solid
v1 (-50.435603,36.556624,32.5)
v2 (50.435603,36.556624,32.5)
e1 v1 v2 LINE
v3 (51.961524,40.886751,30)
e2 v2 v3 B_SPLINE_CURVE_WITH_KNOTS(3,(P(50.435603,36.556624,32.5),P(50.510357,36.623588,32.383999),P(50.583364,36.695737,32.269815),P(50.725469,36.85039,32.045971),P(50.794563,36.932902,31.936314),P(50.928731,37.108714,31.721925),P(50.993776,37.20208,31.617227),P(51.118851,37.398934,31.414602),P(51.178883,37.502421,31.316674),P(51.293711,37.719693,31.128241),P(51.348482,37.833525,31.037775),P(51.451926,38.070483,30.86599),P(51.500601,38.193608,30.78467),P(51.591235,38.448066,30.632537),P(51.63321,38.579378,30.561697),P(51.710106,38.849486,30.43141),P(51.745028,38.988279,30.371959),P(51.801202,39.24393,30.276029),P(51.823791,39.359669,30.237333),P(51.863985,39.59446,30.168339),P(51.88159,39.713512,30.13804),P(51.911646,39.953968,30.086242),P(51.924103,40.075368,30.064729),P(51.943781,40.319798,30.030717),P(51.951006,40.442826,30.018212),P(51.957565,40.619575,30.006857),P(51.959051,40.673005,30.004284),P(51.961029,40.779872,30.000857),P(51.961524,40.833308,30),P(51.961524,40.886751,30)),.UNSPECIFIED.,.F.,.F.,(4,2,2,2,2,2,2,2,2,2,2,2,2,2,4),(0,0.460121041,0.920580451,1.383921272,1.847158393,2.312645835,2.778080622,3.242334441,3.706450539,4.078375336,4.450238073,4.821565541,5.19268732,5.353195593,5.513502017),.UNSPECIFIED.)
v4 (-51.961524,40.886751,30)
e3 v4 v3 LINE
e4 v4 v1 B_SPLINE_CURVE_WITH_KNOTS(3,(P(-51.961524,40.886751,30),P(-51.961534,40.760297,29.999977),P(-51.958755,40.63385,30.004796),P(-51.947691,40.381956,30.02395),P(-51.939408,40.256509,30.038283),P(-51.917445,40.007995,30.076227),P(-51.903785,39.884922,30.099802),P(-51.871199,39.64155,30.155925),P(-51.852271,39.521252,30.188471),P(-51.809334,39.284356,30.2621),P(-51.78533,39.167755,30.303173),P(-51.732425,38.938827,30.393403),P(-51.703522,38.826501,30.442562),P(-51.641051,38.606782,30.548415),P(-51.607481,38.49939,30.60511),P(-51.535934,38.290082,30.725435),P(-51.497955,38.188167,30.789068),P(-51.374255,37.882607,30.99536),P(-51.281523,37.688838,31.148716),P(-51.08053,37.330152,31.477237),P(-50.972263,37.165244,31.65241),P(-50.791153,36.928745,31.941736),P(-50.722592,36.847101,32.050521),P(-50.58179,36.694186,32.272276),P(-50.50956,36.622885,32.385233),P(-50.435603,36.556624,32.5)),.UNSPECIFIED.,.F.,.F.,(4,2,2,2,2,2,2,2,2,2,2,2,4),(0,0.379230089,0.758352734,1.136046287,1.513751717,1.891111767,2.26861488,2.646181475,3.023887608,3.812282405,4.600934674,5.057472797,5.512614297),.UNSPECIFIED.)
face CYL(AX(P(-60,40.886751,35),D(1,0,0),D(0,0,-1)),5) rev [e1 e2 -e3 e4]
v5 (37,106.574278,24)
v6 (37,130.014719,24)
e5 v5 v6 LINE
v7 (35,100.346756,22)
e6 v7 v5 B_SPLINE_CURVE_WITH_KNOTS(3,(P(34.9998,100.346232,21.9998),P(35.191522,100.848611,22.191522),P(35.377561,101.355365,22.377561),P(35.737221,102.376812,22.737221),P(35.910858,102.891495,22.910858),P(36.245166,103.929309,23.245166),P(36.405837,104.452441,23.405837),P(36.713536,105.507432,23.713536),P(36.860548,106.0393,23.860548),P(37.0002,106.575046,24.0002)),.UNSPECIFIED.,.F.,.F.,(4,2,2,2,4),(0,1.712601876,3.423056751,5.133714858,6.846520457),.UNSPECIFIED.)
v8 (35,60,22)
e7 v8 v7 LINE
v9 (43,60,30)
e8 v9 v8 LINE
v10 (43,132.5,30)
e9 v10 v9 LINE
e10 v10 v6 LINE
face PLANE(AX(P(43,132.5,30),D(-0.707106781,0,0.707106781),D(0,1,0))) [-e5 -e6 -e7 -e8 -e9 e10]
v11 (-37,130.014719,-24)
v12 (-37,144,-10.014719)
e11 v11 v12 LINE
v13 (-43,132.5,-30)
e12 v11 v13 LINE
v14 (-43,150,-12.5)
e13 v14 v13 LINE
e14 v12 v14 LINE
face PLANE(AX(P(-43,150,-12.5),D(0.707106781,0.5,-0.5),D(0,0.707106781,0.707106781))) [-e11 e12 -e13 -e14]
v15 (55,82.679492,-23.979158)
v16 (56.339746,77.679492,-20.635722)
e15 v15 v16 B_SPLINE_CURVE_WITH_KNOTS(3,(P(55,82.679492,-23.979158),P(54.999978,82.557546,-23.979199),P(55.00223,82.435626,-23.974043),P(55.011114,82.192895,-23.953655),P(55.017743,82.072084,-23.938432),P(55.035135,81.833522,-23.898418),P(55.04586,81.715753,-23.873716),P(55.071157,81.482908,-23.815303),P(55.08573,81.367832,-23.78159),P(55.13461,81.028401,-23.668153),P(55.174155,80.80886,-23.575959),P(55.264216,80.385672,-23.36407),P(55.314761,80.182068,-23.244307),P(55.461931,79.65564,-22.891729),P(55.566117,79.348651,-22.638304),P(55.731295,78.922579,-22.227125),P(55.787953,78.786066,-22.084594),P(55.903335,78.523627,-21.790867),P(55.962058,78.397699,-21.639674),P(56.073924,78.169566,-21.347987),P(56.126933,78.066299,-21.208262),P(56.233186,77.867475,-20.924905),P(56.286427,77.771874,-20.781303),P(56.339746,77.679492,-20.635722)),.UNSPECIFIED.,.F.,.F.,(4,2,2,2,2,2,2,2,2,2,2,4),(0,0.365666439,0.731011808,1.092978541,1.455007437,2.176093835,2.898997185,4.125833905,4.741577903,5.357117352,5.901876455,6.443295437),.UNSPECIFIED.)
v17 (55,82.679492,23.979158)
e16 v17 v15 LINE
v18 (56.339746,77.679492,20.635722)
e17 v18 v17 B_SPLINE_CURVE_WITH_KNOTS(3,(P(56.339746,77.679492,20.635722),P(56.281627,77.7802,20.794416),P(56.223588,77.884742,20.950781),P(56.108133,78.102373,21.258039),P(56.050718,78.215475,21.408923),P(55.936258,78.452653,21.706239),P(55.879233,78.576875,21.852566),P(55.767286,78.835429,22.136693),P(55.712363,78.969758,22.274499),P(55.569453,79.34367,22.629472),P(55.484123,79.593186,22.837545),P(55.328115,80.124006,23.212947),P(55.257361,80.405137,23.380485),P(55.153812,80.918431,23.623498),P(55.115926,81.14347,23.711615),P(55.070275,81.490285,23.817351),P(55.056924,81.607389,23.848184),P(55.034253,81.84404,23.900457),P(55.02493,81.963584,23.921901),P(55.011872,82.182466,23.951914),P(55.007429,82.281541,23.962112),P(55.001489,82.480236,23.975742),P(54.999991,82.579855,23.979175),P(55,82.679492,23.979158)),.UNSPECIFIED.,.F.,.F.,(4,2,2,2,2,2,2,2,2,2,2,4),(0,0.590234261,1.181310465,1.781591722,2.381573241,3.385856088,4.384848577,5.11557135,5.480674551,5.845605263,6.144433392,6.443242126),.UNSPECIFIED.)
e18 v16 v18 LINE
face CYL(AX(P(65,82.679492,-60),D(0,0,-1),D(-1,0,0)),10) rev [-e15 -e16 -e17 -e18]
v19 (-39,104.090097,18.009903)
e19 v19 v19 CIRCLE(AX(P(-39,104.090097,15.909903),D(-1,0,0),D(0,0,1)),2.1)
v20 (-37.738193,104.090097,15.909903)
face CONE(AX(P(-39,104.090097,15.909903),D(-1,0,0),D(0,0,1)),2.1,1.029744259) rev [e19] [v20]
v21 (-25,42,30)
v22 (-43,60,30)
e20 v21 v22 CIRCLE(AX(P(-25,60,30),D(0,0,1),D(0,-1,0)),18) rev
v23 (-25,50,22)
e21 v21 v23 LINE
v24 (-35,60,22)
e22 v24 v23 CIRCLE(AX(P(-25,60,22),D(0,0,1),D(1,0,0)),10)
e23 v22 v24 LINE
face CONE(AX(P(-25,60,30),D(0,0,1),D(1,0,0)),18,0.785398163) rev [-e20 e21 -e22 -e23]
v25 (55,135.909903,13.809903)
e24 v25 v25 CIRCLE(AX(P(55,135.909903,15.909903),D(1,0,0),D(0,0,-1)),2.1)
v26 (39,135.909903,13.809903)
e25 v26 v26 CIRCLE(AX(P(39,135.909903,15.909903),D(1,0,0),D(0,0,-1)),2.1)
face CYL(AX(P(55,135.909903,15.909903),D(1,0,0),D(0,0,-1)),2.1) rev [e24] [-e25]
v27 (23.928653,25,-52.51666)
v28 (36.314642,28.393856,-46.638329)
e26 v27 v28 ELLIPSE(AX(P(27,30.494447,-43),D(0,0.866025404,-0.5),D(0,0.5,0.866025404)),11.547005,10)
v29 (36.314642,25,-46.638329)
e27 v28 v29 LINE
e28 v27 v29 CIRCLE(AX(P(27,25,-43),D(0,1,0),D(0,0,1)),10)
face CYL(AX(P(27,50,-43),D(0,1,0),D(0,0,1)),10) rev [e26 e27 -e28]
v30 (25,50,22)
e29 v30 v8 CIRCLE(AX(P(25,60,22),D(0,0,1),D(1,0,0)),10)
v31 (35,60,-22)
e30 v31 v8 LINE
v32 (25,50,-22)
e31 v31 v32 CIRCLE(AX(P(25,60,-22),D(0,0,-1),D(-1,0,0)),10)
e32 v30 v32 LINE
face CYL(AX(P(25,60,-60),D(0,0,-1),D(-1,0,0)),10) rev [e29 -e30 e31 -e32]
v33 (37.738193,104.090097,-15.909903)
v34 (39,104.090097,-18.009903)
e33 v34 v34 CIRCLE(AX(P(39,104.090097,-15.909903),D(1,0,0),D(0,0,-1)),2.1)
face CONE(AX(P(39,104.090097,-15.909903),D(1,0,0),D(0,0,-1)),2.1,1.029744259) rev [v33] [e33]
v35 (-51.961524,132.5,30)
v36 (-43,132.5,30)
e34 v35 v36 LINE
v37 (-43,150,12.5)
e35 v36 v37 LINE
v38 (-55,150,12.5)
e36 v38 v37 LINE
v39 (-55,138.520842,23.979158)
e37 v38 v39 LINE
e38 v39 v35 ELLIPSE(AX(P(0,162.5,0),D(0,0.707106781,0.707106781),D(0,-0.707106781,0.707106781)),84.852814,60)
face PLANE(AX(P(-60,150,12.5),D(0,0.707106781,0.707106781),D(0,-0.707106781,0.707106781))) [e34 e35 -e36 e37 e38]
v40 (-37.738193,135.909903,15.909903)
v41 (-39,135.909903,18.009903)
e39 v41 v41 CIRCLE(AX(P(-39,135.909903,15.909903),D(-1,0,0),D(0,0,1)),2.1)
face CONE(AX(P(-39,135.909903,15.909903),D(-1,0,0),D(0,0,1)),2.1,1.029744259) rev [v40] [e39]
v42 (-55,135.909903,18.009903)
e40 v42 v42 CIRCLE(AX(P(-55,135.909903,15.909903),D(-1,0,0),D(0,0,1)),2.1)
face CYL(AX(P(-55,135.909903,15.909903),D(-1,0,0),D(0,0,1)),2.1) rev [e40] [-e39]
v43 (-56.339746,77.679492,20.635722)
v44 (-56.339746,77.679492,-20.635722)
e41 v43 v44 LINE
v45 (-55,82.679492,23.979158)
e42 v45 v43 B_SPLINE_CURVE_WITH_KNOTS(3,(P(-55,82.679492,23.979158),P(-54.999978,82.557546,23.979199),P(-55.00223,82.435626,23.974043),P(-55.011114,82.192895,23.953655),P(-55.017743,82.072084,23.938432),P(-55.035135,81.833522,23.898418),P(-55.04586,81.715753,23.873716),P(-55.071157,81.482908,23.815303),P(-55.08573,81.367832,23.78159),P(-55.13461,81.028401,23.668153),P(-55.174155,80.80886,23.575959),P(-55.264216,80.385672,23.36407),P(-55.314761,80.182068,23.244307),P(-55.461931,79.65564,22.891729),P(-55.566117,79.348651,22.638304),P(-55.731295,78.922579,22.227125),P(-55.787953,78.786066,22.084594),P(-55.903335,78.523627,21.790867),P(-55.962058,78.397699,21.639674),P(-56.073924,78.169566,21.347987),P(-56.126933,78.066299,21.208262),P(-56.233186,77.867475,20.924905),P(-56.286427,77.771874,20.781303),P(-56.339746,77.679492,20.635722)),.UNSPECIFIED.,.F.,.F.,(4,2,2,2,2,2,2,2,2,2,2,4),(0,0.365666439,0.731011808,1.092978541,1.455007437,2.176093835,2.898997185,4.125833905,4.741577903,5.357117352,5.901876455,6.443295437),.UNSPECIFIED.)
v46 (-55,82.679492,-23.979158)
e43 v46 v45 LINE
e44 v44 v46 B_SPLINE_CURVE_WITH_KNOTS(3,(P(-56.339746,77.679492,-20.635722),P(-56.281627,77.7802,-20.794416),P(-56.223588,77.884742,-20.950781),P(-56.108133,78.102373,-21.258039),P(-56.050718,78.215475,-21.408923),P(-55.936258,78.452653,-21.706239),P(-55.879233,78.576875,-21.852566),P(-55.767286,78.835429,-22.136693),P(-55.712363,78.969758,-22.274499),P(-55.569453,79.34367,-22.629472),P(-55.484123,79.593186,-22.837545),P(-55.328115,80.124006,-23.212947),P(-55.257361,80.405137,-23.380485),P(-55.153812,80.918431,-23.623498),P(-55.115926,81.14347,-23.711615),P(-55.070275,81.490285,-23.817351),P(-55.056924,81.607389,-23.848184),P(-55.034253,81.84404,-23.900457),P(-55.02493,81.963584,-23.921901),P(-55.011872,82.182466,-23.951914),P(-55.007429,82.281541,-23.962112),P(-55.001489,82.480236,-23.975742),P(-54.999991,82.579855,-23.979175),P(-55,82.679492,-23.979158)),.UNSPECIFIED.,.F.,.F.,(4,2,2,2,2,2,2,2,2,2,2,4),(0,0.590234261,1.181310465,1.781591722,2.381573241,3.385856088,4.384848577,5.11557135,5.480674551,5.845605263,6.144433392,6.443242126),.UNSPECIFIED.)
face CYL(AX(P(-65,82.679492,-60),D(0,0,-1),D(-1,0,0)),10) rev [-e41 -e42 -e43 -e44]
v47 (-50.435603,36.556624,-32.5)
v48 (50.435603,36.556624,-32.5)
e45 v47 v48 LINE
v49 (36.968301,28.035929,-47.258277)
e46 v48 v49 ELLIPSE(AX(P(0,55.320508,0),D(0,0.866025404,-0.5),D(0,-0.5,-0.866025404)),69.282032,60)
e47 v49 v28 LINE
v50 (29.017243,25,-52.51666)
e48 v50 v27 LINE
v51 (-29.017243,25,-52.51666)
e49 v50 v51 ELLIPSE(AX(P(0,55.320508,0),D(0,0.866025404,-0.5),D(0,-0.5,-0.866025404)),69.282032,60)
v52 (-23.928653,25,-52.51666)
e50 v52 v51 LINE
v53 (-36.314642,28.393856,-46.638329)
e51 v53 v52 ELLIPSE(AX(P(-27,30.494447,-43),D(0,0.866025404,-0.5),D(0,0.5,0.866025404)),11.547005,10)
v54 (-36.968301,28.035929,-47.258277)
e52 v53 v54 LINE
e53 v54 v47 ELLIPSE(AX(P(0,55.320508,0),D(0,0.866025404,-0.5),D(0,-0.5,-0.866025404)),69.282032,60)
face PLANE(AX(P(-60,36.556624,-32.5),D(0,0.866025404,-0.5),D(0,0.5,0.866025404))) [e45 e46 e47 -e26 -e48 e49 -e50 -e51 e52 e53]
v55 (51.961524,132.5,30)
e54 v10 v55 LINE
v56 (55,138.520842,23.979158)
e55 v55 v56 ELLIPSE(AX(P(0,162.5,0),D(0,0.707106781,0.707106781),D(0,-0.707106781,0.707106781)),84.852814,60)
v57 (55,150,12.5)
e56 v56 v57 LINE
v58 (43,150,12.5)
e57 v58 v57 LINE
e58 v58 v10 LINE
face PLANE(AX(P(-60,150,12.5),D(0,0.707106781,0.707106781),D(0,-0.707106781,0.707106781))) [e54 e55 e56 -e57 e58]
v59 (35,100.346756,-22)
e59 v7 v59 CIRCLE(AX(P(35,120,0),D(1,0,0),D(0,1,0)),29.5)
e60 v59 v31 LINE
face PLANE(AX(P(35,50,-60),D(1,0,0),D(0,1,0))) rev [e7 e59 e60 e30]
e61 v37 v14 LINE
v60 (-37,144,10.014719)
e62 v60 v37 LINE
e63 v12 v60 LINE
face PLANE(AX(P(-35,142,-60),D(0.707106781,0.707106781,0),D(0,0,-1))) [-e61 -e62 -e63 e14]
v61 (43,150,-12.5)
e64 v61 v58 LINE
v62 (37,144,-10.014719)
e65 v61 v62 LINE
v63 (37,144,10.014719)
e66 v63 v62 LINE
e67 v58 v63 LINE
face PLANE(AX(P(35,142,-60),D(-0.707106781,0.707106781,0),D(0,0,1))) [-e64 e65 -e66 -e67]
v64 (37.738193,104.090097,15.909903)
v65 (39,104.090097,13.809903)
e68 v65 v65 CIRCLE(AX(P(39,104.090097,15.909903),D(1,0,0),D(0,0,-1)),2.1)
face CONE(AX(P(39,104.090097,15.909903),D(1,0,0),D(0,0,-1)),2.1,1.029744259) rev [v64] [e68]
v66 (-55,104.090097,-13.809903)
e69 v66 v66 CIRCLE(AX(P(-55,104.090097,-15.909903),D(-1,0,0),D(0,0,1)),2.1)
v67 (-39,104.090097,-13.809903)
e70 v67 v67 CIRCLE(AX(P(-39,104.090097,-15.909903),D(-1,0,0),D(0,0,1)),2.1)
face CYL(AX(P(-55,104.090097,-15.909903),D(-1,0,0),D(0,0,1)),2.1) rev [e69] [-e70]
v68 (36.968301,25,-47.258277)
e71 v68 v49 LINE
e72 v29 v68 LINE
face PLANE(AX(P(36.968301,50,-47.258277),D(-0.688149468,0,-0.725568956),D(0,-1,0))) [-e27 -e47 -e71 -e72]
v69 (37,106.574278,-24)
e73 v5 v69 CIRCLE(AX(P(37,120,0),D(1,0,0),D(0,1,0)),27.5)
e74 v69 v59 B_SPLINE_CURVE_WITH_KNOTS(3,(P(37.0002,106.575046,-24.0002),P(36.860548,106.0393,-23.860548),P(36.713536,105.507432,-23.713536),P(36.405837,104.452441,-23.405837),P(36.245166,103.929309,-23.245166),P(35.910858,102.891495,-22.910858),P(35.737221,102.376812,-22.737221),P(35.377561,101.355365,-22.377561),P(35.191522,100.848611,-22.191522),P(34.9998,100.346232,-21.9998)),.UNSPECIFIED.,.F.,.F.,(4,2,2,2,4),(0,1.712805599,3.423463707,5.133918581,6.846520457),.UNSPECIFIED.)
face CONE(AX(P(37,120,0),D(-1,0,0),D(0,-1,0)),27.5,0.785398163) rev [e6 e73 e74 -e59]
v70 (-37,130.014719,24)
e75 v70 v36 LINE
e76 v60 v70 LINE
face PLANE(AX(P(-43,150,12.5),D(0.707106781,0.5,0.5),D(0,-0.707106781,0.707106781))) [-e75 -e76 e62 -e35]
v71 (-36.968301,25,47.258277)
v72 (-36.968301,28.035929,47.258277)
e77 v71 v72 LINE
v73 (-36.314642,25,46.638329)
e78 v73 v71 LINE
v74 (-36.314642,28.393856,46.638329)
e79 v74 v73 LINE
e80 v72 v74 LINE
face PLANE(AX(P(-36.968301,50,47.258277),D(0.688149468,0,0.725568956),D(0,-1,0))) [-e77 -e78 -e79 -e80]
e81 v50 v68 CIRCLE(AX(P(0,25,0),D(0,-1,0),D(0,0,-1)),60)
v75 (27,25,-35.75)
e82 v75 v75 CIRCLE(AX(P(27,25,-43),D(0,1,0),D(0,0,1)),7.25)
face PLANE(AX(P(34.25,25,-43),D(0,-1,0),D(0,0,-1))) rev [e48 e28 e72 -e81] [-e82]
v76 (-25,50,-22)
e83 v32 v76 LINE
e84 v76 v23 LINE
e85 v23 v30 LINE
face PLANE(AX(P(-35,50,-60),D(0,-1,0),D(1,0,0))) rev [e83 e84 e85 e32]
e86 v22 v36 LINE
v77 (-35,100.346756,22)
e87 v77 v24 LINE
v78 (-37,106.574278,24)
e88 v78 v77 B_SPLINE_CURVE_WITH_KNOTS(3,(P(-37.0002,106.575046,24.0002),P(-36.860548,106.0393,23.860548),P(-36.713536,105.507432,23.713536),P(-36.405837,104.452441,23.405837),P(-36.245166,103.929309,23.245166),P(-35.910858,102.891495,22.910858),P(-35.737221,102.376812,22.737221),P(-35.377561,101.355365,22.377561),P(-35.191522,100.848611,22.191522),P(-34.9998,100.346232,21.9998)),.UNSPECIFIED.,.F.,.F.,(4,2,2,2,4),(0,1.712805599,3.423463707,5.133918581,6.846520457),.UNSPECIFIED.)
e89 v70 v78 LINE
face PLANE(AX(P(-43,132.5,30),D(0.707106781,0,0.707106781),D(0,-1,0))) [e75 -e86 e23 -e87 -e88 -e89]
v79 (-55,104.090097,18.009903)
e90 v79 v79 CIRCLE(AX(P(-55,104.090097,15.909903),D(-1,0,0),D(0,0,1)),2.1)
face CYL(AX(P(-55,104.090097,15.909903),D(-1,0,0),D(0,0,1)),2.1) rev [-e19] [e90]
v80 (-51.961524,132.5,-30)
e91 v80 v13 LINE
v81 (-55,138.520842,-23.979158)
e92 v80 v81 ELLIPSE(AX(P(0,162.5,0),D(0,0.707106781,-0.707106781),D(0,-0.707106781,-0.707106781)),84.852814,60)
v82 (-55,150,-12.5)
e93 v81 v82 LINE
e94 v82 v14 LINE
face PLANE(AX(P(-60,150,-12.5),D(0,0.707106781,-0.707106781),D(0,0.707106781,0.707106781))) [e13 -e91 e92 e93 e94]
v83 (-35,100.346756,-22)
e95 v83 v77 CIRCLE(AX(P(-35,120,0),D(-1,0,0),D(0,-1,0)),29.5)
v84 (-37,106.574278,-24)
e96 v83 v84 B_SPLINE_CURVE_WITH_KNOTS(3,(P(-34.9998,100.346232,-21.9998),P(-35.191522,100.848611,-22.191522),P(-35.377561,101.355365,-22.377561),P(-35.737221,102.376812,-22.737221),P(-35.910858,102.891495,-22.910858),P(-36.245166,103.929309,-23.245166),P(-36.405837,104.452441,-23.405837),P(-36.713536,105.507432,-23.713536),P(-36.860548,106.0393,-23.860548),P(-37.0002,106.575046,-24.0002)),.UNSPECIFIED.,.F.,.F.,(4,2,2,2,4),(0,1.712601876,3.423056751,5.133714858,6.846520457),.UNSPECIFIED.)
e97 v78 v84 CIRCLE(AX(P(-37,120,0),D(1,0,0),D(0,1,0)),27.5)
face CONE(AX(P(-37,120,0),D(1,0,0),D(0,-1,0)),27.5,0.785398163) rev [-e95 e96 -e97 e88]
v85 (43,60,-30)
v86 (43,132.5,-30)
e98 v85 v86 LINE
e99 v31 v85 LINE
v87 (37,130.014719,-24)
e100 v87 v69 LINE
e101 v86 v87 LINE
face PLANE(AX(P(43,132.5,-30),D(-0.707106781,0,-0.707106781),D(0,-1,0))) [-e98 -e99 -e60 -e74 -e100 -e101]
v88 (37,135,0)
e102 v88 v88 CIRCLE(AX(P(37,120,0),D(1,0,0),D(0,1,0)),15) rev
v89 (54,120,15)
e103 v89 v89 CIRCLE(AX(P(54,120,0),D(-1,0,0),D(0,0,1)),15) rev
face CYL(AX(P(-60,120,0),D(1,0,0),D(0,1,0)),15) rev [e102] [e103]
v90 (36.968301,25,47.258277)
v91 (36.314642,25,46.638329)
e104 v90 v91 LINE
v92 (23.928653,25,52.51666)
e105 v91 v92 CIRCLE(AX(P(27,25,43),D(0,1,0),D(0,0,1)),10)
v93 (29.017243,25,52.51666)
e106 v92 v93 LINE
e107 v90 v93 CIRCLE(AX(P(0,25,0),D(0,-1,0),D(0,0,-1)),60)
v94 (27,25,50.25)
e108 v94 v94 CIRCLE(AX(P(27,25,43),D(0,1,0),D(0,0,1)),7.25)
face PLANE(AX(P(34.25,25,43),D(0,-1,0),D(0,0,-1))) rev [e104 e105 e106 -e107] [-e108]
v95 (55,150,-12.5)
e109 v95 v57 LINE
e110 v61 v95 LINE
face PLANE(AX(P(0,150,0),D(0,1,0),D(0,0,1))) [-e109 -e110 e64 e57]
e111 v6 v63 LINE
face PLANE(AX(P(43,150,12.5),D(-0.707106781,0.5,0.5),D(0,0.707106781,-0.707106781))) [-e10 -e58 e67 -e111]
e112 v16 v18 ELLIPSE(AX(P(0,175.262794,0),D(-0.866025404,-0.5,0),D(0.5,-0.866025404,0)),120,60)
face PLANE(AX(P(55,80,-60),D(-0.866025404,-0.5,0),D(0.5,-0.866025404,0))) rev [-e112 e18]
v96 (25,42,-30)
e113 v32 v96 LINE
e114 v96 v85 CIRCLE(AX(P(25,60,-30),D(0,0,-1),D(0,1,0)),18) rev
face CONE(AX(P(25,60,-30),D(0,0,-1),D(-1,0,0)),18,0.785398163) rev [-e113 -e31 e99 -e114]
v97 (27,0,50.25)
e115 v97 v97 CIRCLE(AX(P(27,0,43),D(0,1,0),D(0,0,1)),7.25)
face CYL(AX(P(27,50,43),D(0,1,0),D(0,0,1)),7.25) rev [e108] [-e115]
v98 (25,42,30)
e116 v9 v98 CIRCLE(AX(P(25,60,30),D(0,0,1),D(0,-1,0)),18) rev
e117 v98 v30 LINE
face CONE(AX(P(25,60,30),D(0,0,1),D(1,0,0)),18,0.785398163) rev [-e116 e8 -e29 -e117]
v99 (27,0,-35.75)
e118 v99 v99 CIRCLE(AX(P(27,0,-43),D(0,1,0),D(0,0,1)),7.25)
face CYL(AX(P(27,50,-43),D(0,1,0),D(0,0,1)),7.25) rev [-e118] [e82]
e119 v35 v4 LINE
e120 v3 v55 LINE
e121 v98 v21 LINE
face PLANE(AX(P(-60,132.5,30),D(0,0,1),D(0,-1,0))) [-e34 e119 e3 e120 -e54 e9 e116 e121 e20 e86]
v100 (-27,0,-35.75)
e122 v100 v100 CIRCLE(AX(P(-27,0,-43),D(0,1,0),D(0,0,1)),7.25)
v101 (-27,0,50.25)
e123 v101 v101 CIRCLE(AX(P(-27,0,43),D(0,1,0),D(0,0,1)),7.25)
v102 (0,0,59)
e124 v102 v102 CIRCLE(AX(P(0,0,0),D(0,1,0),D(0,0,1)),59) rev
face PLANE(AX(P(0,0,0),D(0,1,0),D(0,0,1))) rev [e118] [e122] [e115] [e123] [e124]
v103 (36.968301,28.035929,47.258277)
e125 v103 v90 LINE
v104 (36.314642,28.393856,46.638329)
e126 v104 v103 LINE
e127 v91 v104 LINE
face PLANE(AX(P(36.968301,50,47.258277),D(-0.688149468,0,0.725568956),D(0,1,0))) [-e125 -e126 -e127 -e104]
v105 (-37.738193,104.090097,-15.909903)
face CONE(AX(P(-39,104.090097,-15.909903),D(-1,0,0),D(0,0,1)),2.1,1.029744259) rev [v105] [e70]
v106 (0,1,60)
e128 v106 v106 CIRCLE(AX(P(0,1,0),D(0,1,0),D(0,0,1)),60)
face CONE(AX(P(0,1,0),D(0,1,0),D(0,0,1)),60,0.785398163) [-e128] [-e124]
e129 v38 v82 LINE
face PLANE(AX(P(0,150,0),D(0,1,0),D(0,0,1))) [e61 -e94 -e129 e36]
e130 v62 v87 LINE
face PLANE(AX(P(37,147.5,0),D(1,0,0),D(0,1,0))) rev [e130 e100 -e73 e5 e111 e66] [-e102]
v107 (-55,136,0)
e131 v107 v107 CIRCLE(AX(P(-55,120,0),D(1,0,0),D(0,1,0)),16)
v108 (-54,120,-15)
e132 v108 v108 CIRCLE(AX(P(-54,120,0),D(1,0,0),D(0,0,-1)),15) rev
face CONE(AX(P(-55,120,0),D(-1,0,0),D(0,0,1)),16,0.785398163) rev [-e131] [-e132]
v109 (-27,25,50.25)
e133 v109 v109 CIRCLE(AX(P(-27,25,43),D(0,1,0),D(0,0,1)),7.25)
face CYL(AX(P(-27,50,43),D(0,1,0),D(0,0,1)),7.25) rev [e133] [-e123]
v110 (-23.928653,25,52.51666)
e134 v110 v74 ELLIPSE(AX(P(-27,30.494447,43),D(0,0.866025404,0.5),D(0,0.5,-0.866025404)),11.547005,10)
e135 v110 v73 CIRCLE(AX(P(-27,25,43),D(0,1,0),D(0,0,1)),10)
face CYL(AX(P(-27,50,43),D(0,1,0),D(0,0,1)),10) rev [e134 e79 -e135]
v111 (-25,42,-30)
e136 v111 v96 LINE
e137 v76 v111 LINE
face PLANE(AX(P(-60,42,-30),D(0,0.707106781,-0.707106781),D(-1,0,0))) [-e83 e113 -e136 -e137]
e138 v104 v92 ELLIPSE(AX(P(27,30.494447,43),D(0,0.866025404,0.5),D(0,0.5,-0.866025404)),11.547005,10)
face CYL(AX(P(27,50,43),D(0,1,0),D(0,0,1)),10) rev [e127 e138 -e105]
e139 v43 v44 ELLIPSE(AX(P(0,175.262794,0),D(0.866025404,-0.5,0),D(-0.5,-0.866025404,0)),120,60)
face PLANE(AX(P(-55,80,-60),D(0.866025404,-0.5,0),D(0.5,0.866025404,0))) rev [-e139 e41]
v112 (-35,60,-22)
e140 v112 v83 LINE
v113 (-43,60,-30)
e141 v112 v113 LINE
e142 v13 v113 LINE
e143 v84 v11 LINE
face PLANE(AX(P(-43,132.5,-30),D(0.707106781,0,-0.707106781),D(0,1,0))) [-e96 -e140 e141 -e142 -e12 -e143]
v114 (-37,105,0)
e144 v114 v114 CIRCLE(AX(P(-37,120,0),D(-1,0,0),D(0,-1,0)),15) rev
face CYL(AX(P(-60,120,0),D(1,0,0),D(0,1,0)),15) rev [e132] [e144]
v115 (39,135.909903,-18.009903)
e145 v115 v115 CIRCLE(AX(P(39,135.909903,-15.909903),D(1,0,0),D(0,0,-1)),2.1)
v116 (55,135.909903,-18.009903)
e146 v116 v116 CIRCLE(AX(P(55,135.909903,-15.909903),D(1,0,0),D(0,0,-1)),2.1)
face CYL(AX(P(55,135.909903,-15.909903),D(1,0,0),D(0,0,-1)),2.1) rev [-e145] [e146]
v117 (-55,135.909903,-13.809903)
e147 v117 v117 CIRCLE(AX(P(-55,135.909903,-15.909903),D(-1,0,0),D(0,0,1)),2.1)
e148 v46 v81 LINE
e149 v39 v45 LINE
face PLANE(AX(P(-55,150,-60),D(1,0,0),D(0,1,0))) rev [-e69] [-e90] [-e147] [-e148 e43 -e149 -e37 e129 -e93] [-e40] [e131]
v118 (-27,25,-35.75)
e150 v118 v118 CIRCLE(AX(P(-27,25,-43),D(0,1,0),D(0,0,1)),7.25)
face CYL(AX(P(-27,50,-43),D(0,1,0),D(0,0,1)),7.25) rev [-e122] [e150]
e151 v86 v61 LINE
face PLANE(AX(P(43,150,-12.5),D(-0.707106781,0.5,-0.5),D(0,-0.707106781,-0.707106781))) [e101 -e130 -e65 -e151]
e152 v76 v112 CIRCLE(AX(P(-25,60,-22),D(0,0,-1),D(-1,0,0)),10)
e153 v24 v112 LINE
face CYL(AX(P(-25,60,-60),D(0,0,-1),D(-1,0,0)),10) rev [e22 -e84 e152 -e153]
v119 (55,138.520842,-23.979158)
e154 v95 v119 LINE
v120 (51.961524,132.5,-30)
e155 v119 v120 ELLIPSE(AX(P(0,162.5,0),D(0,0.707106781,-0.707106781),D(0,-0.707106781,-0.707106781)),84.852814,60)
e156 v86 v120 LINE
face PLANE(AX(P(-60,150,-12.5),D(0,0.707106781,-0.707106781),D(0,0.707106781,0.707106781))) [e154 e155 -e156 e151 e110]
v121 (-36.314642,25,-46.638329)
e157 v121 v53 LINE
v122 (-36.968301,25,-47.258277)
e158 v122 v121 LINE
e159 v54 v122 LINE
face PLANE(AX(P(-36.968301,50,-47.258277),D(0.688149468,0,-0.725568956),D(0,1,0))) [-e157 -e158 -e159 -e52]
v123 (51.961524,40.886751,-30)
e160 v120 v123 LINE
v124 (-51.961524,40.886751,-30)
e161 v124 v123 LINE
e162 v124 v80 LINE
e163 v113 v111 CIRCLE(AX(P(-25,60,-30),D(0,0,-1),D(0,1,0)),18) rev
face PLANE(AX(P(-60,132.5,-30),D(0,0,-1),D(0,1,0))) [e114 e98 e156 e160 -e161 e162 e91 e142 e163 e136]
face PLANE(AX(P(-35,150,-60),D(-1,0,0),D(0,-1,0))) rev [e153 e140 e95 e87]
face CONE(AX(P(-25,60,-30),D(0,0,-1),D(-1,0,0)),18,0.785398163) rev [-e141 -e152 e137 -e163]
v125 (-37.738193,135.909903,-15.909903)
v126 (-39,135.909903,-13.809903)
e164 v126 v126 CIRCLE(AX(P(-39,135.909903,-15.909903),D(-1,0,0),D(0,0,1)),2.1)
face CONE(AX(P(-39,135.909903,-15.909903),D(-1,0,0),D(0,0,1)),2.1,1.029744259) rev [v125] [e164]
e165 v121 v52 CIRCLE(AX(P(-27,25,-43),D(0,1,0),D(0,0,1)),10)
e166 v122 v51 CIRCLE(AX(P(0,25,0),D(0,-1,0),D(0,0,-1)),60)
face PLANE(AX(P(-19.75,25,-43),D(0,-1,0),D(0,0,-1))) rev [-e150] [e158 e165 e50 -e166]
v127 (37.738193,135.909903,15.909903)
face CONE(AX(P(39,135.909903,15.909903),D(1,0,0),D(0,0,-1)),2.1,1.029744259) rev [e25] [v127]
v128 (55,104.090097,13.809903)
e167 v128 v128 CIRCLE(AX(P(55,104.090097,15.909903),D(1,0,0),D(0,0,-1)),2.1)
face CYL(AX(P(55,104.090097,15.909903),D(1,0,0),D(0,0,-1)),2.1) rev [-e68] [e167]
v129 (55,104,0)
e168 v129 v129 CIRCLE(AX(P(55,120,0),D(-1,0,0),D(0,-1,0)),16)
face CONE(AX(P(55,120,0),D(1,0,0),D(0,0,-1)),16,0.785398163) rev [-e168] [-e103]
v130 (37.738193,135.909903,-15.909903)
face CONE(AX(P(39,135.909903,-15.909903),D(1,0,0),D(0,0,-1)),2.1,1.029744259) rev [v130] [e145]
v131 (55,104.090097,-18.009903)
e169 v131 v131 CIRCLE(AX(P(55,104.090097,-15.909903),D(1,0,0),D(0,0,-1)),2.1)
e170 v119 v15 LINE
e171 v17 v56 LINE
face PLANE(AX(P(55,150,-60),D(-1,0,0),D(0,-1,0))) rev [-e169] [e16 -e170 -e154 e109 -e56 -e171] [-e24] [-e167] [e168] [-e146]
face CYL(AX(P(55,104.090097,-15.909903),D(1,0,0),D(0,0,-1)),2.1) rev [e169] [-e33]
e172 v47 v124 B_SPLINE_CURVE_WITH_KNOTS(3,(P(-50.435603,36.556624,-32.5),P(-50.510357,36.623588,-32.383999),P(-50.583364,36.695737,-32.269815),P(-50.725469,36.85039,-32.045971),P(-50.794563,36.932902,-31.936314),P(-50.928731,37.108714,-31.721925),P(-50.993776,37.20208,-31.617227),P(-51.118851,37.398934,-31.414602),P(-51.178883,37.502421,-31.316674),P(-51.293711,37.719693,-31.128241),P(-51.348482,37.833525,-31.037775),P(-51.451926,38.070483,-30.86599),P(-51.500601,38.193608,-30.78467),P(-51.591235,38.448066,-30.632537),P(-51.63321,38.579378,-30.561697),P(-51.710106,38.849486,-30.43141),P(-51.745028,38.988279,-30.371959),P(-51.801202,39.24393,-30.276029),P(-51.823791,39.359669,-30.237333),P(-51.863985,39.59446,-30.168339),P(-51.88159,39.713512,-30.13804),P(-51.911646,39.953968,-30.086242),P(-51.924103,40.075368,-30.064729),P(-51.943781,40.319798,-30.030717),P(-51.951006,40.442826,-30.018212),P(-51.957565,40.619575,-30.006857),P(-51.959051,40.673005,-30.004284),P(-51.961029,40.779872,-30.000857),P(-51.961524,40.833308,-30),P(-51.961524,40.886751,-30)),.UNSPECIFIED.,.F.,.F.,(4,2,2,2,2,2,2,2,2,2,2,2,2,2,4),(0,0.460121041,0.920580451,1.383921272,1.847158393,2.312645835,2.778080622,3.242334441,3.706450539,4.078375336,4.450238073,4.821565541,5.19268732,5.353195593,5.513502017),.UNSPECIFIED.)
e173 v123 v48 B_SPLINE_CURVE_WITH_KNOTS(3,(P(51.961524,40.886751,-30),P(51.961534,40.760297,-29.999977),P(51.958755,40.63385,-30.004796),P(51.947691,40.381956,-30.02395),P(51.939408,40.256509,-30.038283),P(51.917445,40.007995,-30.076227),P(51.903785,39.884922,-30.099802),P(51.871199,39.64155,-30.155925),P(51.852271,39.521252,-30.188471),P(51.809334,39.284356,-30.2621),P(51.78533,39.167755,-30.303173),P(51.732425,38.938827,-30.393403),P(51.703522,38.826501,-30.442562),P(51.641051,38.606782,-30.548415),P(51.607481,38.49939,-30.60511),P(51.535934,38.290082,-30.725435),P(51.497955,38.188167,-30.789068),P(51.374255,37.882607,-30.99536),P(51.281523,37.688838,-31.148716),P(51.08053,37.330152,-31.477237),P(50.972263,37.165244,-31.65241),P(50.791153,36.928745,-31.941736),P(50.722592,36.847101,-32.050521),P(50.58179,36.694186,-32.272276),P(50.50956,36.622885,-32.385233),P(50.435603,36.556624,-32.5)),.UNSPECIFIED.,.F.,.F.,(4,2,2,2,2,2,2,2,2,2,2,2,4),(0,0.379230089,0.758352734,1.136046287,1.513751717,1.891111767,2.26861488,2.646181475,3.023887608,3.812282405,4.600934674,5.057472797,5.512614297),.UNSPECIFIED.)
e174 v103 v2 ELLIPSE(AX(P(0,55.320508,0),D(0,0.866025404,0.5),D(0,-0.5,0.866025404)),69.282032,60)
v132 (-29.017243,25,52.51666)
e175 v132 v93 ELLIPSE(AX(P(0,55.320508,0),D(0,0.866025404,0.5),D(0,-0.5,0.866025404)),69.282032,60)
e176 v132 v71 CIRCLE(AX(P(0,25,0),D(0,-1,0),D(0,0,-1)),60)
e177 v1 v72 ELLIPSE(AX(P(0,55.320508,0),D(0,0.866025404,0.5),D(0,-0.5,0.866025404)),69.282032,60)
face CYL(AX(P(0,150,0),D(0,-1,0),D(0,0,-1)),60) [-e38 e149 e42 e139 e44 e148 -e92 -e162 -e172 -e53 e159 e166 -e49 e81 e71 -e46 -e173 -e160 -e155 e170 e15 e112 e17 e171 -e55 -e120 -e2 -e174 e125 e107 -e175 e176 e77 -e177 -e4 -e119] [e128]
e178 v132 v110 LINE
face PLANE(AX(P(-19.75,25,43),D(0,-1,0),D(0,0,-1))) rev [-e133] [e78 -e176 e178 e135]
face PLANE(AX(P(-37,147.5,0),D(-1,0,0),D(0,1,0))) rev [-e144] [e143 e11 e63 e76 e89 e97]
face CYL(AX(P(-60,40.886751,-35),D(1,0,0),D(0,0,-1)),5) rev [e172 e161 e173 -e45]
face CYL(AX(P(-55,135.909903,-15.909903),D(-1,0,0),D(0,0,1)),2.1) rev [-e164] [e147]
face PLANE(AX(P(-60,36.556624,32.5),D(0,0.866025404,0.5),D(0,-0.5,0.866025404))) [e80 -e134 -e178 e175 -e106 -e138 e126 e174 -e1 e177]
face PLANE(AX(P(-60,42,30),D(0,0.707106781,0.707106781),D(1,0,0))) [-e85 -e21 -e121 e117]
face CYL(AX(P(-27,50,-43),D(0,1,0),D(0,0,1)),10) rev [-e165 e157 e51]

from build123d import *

# Parameters (mm, degrees)
SKETCH1_R               = 60
BOSS_EXTRUDE1_DEPTH     = 150
CUT_EXTRUDE1_DEPTH      = 173.336879396
CUT_EXTRUDE1_DEPTH_BACK = 173.336879396
SKETCH2_W               = 70
SKETCH2_H               = 100
FILLET1_R               = 10
CUT_EXTRUDE2_DEPTH      = 173.336879553
CUT_EXTRUDE2_DEPTH_BACK = 173.336879553
SKETCH3_OUTSIDE_W       = 167.3
SKETCH3_OUTSIDE_H       = 197.3
CUT_EXTRUDE3_DEPTH      = 199.305320239
CUT_EXTRUDE3_DEPTH_BACK = 199.305320239
SKETCH4_R               = 15
CIRPATTERN1_COUNT       = 4
CHAMFER1_SIZE           = 8
HOLE1_D                 = 14.5
HOLE1_CBORE_D           = 20
HOLE1_CBORE_DEPTH       = 25
CHAMFER3_SIZE           = 1
CHAMFER4_SIZE           = 1


with BuildPart() as part:
    # Sketch1 → Boss-Extrude1 (new body)
    with BuildSketch(Plane(origin=(0, 0, 0), x_dir=(1, 0, 0), z_dir=(0, 1, 0))):
        with Locations(Location((0, 0, 0), (0, 0, 270))):
            Circle(SKETCH1_R)
    extrude(amount=BOSS_EXTRUDE1_DEPTH)

    # Sketch2 → Cut-Extrude1 (cut, two sides: drawn at the far end of the back side and taken through both)
    with BuildSketch(Plane.XY.offset(-CUT_EXTRUDE1_DEPTH_BACK)):
        with Locations((0, 100)):
            Rectangle(SKETCH2_W, SKETCH2_H)
        Polygon((-55, 150), (-55, 80), (-60, 71.339745962), (-60, 150), align=None)
        Polygon((55, 80), (60, 71.339745962), (60, 150), (55, 150), align=None)
    extrude(amount=CUT_EXTRUDE1_DEPTH + CUT_EXTRUDE1_DEPTH_BACK, mode=Mode.SUBTRACT)

    # Fillet1
    fillet1_edges = [part.edges().sort_by_distance(p)[0] for p in [
        (-35, 50, 0),
        (35, 50, 0),
        (-55, 80, 0),
        (55, 80, 0),
    ]]
    fillet(fillet1_edges, radius=FILLET1_R)

    # Sketch3 outside → Cut-Extrude2 (cut, two sides: drawn at the far end of the back side and taken through both)
    with BuildSketch(Plane(origin=(0, 0, 0), x_dir=(0, 0, -1), z_dir=(1, 0, 0)).offset(-CUT_EXTRUDE2_DEPTH_BACK)):
        with Locations((0, 75)):
            Rectangle(SKETCH3_OUTSIDE_W, SKETCH3_OUTSIDE_H)
        with BuildLine():
            Line((-12.5, 150), (-30, 132.5))
            Line((-30, 132.5), (-30, 40.886751346))
            ThreePointArc((-30, 40.886751346), (-30.669872981, 38.386751346), (-32.5, 36.556624327))
            Line((-32.5, 36.556624327), (-60, 20.679491924))
            Line((-60, 20.679491924), (-60, 0))
            Line((-60, 0), (60, 0))
            Line((60, 0), (60, 20.679491924))
            Line((60, 20.679491924), (32.5, 36.556624327))
            ThreePointArc((32.5, 36.556624327), (30.669872981, 38.386751346), (30, 40.886751346))
            Line((30, 40.886751346), (30, 132.5))
            Line((30, 132.5), (12.5, 150))
            Line((12.5, 150), (-12.5, 150))
        make_face(mode=Mode.SUBTRACT)
    extrude(amount=CUT_EXTRUDE2_DEPTH + CUT_EXTRUDE2_DEPTH_BACK, mode=Mode.SUBTRACT)

    # Sketch4 → Cut-Extrude3 (cut, two sides: drawn at the far end of the back side and taken through both)
    with BuildSketch(Plane(origin=(55, 0, 0), x_dir=(0, 0, -1), z_dir=(1, 0, 0)).offset(-CUT_EXTRUDE3_DEPTH_BACK)):
        with Locations(Location((0, 120, 0), (0, 0, 90))):
            Circle(SKETCH4_R)
    extrude(amount=CUT_EXTRUDE3_DEPTH + CUT_EXTRUDE3_DEPTH_BACK, mode=Mode.SUBTRACT)

    # Sketch6 → M5 Tapped Hole1 (revolve, cut)
    with BuildSketch(Plane(origin=(55, 135.909902577, -15.909902577), x_dir=(0, 0, -1), z_dir=(0, 1, 0))):
        Polygon((0, 0), (0, 17.2618073), (2.1, 16), (2.1, 0), align=None)
    m5_tapped_hole1 = revolve(axis=Axis((61.35, 135.909902577, -15.909902577), (-1, 0, 0)), mode=Mode.SUBTRACT)

    # CirPattern1: M5 Tapped Hole1 ×4 about axis
    cirpattern1_axis = Axis((0, 120, 0), (1, 0, 0))
    for i in range(1, CIRPATTERN1_COUNT):
        add(m5_tapped_hole1.rotate(cirpattern1_axis, i * 360 / CIRPATTERN1_COUNT), mode=Mode.SUBTRACT)

    # Mirror1: M5 Tapped Hole1 across plane
    add(m5_tapped_hole1.mirror(Plane(origin=(0, 0, 0), x_dir=(0, 0, 1), z_dir=(1, 0, 0))), mode=Mode.SUBTRACT)

    # Mirror1 copy 1 sketch → Mirror1 copy 1 (revolve, cut)
    with BuildSketch(Plane(origin=(-55, 135.909902577, 15.909902577), x_dir=(0, 1, 0), z_dir=(0, 0, 1))):
        Polygon((0, 0), (0, -17.2618073), (2.1, -16), (2.1, 0), align=None)
    revolve(axis=Axis((-61.35, 135.909902577, 15.909902577), (-1, 0, 0)), mode=Mode.SUBTRACT)

    # Mirror1 copy 2 sketch → Mirror1 copy 2 (revolve, cut)
    with BuildSketch(Plane(origin=(-55, 104.090097423, 15.909902577), x_dir=(0, 0, 1), z_dir=(0, -1, 0))):
        Polygon((0, 0), (0, -17.2618073), (2.1, -16), (2.1, 0), align=None)
    revolve(axis=Axis((-61.35, 104.090097423, 15.909902577), (-1, 0, 0)), mode=Mode.SUBTRACT)

    # Mirror1 copy 3 sketch → Mirror1 copy 3 (revolve, cut)
    with BuildSketch(Plane(origin=(-55, 104.090097423, -15.909902577), x_dir=(0, -1, 0), z_dir=(0, 0, -1))):
        Polygon((0, 0), (0, -17.2618073), (2.1, -16), (2.1, 0), align=None)
    revolve(axis=Axis((-61.35, 104.090097423, -15.909902577), (-1, 0, 0)), mode=Mode.SUBTRACT)

    # Chamfer1
    chamfer1_edges = [part.edges().sort_by_distance(p)[0] for p in [
        (32.071067812, 52.928932188, 30),
        (32.071067812, 52.928932188, -30),
        (-35, 150, 0),
        (35, 150, 0),
        (35, 141.25, -21.25),
        (-35, 141.25, -21.25),
        (35, 141.25, 21.25),
        (-35, 141.25, 21.25),
        (-35, 96.25, -30),
        (-32.071067812, 52.928932188, -30),
        (0, 50, -30),
        (35, 96.25, -30),
        (-32.071067812, 52.928932188, 30),
        (-35, 96.25, 30),
        (35, 96.25, 30),
        (0, 50, 30),
    ]]
    chamfer(chamfer1_edges, length=CHAMFER1_SIZE)

    # Hole1 (through all)
    with Locations(Plane(origin=(-27, 50, -43), x_dir=(1, 0, 0), z_dir=(0, 1, 0))):
        with Locations((0, 0), (54, 0), (0, -86), (54, -86)):
            CounterBoreHole(HOLE1_D / 2, HOLE1_CBORE_D / 2, HOLE1_CBORE_DEPTH)

    # Chamfer3
    chamfer3_edges = [part.edges().sort_by_distance(p)[0] for p in [
        (0, 0, -60),
    ]]
    chamfer(chamfer3_edges, length=CHAMFER3_SIZE)

    # Chamfer4
    chamfer4_edges = [part.edges().sort_by_distance(p)[0] for p in [
        (55, 105, 0),
        (-55, 105, 0),
    ]]
    chamfer(chamfer4_edges, length=CHAMFER4_SIZE)

    # Chamfer5
    # the kernel refuses this chamfer: 2 mm, written as the material it takes off along each edge
    with BuildSketch(Plane(origin=(35.377389831, 32.524460395, -48.460708711), x_dir=(0.7977683815580907, 0, 0.6029640199764695), z_dir=(0, -1, 0))) as chamfer5_piece_1:
        with BuildLine():
            Line((1.994201413, 0), (1.846539445, 0.888707135))
            ThreePointArc((1.846539445, 0.888707135), (0.956280866, 0.401837503), (0, 0))
            ThreePointArc((0, 0), (1.003653566, -0.008285296), (1.994201413, 0))
        make_face()
    extrude(amount=7.524460395, mode=Mode.SUBTRACT)
    with BuildSketch(Plane(origin=(-35.377389831, 32.524460395, -48.460708711), x_dir=(-0.7977683815580952, 0, 0.602964019976464), z_dir=(0, -1, 0))) as chamfer5_piece_2:
        with BuildLine():
            Line((1.994201413, 0), (1.846539445, -0.888707135))
            ThreePointArc((1.846539445, -0.888707135), (0.956280866, -0.401837503), (0, 0))
            ThreePointArc((0, 0), (1.003653566, 0.008285296), (1.994201413, 0))
        make_face()
    extrude(amount=7.524460395, mode=Mode.SUBTRACT)

    # Chamfer6
    # the kernel refuses this chamfer: 2 mm, written as the material it takes off along each edge
    with BuildSketch(Plane(origin=(-35.377389831, 32.524460395, 48.460708711), x_dir=(-0.45735909504580285, 0, -0.8892821026979484), z_dir=(0, -1, 0))) as chamfer6_piece_1:
        with BuildLine():
            Line((2.049270186, 0), (1.79691853, -0.864825457))
            ThreePointArc((1.79691853, -0.864825457), (0.900770777, -0.442720154), (0, 0))
            ThreePointArc((0, 0), (1.035942557, -0.052625969), (2.049270186, 0))
        make_face()
    extrude(amount=7.524460395, mode=Mode.SUBTRACT)
    with BuildSketch(Plane(origin=(35.377389831, 32.524460395, 48.460708711), x_dir=(0.45735909504580835, 0, -0.8892821026979455), z_dir=(0, -1, 0))) as chamfer6_piece_2:
        with BuildLine():
            Line((2.049270186, 0), (1.79691853, 0.864825457))
            ThreePointArc((1.79691853, 0.864825457), (0.900770777, 0.442720154), (0, 0))
            ThreePointArc((0, 0), (1.035942557, 0.052625969), (2.049270186, 0))
        make_face()
    extrude(amount=7.524460395, mode=Mode.SUBTRACT)

    # Sketch12 → Cut-Revolve1 (revolve, cut)
    with BuildSketch(Plane.XY):
        Polygon((37, 147.5), (37, 120), (32, 120), (32, 152.5), align=None)
    cut_revolve1 = revolve(axis=Axis((37, 120, 0), (-1, 0, 0)), mode=Mode.SUBTRACT)

    # Mirror2: Cut-Revolve1 across plane
    add(cut_revolve1.mirror(Plane(origin=(0, 0, 0), x_dir=(0, 0, 1), z_dir=(1, 0, 0))), mode=Mode.SUBTRACT)


solid = part.part
